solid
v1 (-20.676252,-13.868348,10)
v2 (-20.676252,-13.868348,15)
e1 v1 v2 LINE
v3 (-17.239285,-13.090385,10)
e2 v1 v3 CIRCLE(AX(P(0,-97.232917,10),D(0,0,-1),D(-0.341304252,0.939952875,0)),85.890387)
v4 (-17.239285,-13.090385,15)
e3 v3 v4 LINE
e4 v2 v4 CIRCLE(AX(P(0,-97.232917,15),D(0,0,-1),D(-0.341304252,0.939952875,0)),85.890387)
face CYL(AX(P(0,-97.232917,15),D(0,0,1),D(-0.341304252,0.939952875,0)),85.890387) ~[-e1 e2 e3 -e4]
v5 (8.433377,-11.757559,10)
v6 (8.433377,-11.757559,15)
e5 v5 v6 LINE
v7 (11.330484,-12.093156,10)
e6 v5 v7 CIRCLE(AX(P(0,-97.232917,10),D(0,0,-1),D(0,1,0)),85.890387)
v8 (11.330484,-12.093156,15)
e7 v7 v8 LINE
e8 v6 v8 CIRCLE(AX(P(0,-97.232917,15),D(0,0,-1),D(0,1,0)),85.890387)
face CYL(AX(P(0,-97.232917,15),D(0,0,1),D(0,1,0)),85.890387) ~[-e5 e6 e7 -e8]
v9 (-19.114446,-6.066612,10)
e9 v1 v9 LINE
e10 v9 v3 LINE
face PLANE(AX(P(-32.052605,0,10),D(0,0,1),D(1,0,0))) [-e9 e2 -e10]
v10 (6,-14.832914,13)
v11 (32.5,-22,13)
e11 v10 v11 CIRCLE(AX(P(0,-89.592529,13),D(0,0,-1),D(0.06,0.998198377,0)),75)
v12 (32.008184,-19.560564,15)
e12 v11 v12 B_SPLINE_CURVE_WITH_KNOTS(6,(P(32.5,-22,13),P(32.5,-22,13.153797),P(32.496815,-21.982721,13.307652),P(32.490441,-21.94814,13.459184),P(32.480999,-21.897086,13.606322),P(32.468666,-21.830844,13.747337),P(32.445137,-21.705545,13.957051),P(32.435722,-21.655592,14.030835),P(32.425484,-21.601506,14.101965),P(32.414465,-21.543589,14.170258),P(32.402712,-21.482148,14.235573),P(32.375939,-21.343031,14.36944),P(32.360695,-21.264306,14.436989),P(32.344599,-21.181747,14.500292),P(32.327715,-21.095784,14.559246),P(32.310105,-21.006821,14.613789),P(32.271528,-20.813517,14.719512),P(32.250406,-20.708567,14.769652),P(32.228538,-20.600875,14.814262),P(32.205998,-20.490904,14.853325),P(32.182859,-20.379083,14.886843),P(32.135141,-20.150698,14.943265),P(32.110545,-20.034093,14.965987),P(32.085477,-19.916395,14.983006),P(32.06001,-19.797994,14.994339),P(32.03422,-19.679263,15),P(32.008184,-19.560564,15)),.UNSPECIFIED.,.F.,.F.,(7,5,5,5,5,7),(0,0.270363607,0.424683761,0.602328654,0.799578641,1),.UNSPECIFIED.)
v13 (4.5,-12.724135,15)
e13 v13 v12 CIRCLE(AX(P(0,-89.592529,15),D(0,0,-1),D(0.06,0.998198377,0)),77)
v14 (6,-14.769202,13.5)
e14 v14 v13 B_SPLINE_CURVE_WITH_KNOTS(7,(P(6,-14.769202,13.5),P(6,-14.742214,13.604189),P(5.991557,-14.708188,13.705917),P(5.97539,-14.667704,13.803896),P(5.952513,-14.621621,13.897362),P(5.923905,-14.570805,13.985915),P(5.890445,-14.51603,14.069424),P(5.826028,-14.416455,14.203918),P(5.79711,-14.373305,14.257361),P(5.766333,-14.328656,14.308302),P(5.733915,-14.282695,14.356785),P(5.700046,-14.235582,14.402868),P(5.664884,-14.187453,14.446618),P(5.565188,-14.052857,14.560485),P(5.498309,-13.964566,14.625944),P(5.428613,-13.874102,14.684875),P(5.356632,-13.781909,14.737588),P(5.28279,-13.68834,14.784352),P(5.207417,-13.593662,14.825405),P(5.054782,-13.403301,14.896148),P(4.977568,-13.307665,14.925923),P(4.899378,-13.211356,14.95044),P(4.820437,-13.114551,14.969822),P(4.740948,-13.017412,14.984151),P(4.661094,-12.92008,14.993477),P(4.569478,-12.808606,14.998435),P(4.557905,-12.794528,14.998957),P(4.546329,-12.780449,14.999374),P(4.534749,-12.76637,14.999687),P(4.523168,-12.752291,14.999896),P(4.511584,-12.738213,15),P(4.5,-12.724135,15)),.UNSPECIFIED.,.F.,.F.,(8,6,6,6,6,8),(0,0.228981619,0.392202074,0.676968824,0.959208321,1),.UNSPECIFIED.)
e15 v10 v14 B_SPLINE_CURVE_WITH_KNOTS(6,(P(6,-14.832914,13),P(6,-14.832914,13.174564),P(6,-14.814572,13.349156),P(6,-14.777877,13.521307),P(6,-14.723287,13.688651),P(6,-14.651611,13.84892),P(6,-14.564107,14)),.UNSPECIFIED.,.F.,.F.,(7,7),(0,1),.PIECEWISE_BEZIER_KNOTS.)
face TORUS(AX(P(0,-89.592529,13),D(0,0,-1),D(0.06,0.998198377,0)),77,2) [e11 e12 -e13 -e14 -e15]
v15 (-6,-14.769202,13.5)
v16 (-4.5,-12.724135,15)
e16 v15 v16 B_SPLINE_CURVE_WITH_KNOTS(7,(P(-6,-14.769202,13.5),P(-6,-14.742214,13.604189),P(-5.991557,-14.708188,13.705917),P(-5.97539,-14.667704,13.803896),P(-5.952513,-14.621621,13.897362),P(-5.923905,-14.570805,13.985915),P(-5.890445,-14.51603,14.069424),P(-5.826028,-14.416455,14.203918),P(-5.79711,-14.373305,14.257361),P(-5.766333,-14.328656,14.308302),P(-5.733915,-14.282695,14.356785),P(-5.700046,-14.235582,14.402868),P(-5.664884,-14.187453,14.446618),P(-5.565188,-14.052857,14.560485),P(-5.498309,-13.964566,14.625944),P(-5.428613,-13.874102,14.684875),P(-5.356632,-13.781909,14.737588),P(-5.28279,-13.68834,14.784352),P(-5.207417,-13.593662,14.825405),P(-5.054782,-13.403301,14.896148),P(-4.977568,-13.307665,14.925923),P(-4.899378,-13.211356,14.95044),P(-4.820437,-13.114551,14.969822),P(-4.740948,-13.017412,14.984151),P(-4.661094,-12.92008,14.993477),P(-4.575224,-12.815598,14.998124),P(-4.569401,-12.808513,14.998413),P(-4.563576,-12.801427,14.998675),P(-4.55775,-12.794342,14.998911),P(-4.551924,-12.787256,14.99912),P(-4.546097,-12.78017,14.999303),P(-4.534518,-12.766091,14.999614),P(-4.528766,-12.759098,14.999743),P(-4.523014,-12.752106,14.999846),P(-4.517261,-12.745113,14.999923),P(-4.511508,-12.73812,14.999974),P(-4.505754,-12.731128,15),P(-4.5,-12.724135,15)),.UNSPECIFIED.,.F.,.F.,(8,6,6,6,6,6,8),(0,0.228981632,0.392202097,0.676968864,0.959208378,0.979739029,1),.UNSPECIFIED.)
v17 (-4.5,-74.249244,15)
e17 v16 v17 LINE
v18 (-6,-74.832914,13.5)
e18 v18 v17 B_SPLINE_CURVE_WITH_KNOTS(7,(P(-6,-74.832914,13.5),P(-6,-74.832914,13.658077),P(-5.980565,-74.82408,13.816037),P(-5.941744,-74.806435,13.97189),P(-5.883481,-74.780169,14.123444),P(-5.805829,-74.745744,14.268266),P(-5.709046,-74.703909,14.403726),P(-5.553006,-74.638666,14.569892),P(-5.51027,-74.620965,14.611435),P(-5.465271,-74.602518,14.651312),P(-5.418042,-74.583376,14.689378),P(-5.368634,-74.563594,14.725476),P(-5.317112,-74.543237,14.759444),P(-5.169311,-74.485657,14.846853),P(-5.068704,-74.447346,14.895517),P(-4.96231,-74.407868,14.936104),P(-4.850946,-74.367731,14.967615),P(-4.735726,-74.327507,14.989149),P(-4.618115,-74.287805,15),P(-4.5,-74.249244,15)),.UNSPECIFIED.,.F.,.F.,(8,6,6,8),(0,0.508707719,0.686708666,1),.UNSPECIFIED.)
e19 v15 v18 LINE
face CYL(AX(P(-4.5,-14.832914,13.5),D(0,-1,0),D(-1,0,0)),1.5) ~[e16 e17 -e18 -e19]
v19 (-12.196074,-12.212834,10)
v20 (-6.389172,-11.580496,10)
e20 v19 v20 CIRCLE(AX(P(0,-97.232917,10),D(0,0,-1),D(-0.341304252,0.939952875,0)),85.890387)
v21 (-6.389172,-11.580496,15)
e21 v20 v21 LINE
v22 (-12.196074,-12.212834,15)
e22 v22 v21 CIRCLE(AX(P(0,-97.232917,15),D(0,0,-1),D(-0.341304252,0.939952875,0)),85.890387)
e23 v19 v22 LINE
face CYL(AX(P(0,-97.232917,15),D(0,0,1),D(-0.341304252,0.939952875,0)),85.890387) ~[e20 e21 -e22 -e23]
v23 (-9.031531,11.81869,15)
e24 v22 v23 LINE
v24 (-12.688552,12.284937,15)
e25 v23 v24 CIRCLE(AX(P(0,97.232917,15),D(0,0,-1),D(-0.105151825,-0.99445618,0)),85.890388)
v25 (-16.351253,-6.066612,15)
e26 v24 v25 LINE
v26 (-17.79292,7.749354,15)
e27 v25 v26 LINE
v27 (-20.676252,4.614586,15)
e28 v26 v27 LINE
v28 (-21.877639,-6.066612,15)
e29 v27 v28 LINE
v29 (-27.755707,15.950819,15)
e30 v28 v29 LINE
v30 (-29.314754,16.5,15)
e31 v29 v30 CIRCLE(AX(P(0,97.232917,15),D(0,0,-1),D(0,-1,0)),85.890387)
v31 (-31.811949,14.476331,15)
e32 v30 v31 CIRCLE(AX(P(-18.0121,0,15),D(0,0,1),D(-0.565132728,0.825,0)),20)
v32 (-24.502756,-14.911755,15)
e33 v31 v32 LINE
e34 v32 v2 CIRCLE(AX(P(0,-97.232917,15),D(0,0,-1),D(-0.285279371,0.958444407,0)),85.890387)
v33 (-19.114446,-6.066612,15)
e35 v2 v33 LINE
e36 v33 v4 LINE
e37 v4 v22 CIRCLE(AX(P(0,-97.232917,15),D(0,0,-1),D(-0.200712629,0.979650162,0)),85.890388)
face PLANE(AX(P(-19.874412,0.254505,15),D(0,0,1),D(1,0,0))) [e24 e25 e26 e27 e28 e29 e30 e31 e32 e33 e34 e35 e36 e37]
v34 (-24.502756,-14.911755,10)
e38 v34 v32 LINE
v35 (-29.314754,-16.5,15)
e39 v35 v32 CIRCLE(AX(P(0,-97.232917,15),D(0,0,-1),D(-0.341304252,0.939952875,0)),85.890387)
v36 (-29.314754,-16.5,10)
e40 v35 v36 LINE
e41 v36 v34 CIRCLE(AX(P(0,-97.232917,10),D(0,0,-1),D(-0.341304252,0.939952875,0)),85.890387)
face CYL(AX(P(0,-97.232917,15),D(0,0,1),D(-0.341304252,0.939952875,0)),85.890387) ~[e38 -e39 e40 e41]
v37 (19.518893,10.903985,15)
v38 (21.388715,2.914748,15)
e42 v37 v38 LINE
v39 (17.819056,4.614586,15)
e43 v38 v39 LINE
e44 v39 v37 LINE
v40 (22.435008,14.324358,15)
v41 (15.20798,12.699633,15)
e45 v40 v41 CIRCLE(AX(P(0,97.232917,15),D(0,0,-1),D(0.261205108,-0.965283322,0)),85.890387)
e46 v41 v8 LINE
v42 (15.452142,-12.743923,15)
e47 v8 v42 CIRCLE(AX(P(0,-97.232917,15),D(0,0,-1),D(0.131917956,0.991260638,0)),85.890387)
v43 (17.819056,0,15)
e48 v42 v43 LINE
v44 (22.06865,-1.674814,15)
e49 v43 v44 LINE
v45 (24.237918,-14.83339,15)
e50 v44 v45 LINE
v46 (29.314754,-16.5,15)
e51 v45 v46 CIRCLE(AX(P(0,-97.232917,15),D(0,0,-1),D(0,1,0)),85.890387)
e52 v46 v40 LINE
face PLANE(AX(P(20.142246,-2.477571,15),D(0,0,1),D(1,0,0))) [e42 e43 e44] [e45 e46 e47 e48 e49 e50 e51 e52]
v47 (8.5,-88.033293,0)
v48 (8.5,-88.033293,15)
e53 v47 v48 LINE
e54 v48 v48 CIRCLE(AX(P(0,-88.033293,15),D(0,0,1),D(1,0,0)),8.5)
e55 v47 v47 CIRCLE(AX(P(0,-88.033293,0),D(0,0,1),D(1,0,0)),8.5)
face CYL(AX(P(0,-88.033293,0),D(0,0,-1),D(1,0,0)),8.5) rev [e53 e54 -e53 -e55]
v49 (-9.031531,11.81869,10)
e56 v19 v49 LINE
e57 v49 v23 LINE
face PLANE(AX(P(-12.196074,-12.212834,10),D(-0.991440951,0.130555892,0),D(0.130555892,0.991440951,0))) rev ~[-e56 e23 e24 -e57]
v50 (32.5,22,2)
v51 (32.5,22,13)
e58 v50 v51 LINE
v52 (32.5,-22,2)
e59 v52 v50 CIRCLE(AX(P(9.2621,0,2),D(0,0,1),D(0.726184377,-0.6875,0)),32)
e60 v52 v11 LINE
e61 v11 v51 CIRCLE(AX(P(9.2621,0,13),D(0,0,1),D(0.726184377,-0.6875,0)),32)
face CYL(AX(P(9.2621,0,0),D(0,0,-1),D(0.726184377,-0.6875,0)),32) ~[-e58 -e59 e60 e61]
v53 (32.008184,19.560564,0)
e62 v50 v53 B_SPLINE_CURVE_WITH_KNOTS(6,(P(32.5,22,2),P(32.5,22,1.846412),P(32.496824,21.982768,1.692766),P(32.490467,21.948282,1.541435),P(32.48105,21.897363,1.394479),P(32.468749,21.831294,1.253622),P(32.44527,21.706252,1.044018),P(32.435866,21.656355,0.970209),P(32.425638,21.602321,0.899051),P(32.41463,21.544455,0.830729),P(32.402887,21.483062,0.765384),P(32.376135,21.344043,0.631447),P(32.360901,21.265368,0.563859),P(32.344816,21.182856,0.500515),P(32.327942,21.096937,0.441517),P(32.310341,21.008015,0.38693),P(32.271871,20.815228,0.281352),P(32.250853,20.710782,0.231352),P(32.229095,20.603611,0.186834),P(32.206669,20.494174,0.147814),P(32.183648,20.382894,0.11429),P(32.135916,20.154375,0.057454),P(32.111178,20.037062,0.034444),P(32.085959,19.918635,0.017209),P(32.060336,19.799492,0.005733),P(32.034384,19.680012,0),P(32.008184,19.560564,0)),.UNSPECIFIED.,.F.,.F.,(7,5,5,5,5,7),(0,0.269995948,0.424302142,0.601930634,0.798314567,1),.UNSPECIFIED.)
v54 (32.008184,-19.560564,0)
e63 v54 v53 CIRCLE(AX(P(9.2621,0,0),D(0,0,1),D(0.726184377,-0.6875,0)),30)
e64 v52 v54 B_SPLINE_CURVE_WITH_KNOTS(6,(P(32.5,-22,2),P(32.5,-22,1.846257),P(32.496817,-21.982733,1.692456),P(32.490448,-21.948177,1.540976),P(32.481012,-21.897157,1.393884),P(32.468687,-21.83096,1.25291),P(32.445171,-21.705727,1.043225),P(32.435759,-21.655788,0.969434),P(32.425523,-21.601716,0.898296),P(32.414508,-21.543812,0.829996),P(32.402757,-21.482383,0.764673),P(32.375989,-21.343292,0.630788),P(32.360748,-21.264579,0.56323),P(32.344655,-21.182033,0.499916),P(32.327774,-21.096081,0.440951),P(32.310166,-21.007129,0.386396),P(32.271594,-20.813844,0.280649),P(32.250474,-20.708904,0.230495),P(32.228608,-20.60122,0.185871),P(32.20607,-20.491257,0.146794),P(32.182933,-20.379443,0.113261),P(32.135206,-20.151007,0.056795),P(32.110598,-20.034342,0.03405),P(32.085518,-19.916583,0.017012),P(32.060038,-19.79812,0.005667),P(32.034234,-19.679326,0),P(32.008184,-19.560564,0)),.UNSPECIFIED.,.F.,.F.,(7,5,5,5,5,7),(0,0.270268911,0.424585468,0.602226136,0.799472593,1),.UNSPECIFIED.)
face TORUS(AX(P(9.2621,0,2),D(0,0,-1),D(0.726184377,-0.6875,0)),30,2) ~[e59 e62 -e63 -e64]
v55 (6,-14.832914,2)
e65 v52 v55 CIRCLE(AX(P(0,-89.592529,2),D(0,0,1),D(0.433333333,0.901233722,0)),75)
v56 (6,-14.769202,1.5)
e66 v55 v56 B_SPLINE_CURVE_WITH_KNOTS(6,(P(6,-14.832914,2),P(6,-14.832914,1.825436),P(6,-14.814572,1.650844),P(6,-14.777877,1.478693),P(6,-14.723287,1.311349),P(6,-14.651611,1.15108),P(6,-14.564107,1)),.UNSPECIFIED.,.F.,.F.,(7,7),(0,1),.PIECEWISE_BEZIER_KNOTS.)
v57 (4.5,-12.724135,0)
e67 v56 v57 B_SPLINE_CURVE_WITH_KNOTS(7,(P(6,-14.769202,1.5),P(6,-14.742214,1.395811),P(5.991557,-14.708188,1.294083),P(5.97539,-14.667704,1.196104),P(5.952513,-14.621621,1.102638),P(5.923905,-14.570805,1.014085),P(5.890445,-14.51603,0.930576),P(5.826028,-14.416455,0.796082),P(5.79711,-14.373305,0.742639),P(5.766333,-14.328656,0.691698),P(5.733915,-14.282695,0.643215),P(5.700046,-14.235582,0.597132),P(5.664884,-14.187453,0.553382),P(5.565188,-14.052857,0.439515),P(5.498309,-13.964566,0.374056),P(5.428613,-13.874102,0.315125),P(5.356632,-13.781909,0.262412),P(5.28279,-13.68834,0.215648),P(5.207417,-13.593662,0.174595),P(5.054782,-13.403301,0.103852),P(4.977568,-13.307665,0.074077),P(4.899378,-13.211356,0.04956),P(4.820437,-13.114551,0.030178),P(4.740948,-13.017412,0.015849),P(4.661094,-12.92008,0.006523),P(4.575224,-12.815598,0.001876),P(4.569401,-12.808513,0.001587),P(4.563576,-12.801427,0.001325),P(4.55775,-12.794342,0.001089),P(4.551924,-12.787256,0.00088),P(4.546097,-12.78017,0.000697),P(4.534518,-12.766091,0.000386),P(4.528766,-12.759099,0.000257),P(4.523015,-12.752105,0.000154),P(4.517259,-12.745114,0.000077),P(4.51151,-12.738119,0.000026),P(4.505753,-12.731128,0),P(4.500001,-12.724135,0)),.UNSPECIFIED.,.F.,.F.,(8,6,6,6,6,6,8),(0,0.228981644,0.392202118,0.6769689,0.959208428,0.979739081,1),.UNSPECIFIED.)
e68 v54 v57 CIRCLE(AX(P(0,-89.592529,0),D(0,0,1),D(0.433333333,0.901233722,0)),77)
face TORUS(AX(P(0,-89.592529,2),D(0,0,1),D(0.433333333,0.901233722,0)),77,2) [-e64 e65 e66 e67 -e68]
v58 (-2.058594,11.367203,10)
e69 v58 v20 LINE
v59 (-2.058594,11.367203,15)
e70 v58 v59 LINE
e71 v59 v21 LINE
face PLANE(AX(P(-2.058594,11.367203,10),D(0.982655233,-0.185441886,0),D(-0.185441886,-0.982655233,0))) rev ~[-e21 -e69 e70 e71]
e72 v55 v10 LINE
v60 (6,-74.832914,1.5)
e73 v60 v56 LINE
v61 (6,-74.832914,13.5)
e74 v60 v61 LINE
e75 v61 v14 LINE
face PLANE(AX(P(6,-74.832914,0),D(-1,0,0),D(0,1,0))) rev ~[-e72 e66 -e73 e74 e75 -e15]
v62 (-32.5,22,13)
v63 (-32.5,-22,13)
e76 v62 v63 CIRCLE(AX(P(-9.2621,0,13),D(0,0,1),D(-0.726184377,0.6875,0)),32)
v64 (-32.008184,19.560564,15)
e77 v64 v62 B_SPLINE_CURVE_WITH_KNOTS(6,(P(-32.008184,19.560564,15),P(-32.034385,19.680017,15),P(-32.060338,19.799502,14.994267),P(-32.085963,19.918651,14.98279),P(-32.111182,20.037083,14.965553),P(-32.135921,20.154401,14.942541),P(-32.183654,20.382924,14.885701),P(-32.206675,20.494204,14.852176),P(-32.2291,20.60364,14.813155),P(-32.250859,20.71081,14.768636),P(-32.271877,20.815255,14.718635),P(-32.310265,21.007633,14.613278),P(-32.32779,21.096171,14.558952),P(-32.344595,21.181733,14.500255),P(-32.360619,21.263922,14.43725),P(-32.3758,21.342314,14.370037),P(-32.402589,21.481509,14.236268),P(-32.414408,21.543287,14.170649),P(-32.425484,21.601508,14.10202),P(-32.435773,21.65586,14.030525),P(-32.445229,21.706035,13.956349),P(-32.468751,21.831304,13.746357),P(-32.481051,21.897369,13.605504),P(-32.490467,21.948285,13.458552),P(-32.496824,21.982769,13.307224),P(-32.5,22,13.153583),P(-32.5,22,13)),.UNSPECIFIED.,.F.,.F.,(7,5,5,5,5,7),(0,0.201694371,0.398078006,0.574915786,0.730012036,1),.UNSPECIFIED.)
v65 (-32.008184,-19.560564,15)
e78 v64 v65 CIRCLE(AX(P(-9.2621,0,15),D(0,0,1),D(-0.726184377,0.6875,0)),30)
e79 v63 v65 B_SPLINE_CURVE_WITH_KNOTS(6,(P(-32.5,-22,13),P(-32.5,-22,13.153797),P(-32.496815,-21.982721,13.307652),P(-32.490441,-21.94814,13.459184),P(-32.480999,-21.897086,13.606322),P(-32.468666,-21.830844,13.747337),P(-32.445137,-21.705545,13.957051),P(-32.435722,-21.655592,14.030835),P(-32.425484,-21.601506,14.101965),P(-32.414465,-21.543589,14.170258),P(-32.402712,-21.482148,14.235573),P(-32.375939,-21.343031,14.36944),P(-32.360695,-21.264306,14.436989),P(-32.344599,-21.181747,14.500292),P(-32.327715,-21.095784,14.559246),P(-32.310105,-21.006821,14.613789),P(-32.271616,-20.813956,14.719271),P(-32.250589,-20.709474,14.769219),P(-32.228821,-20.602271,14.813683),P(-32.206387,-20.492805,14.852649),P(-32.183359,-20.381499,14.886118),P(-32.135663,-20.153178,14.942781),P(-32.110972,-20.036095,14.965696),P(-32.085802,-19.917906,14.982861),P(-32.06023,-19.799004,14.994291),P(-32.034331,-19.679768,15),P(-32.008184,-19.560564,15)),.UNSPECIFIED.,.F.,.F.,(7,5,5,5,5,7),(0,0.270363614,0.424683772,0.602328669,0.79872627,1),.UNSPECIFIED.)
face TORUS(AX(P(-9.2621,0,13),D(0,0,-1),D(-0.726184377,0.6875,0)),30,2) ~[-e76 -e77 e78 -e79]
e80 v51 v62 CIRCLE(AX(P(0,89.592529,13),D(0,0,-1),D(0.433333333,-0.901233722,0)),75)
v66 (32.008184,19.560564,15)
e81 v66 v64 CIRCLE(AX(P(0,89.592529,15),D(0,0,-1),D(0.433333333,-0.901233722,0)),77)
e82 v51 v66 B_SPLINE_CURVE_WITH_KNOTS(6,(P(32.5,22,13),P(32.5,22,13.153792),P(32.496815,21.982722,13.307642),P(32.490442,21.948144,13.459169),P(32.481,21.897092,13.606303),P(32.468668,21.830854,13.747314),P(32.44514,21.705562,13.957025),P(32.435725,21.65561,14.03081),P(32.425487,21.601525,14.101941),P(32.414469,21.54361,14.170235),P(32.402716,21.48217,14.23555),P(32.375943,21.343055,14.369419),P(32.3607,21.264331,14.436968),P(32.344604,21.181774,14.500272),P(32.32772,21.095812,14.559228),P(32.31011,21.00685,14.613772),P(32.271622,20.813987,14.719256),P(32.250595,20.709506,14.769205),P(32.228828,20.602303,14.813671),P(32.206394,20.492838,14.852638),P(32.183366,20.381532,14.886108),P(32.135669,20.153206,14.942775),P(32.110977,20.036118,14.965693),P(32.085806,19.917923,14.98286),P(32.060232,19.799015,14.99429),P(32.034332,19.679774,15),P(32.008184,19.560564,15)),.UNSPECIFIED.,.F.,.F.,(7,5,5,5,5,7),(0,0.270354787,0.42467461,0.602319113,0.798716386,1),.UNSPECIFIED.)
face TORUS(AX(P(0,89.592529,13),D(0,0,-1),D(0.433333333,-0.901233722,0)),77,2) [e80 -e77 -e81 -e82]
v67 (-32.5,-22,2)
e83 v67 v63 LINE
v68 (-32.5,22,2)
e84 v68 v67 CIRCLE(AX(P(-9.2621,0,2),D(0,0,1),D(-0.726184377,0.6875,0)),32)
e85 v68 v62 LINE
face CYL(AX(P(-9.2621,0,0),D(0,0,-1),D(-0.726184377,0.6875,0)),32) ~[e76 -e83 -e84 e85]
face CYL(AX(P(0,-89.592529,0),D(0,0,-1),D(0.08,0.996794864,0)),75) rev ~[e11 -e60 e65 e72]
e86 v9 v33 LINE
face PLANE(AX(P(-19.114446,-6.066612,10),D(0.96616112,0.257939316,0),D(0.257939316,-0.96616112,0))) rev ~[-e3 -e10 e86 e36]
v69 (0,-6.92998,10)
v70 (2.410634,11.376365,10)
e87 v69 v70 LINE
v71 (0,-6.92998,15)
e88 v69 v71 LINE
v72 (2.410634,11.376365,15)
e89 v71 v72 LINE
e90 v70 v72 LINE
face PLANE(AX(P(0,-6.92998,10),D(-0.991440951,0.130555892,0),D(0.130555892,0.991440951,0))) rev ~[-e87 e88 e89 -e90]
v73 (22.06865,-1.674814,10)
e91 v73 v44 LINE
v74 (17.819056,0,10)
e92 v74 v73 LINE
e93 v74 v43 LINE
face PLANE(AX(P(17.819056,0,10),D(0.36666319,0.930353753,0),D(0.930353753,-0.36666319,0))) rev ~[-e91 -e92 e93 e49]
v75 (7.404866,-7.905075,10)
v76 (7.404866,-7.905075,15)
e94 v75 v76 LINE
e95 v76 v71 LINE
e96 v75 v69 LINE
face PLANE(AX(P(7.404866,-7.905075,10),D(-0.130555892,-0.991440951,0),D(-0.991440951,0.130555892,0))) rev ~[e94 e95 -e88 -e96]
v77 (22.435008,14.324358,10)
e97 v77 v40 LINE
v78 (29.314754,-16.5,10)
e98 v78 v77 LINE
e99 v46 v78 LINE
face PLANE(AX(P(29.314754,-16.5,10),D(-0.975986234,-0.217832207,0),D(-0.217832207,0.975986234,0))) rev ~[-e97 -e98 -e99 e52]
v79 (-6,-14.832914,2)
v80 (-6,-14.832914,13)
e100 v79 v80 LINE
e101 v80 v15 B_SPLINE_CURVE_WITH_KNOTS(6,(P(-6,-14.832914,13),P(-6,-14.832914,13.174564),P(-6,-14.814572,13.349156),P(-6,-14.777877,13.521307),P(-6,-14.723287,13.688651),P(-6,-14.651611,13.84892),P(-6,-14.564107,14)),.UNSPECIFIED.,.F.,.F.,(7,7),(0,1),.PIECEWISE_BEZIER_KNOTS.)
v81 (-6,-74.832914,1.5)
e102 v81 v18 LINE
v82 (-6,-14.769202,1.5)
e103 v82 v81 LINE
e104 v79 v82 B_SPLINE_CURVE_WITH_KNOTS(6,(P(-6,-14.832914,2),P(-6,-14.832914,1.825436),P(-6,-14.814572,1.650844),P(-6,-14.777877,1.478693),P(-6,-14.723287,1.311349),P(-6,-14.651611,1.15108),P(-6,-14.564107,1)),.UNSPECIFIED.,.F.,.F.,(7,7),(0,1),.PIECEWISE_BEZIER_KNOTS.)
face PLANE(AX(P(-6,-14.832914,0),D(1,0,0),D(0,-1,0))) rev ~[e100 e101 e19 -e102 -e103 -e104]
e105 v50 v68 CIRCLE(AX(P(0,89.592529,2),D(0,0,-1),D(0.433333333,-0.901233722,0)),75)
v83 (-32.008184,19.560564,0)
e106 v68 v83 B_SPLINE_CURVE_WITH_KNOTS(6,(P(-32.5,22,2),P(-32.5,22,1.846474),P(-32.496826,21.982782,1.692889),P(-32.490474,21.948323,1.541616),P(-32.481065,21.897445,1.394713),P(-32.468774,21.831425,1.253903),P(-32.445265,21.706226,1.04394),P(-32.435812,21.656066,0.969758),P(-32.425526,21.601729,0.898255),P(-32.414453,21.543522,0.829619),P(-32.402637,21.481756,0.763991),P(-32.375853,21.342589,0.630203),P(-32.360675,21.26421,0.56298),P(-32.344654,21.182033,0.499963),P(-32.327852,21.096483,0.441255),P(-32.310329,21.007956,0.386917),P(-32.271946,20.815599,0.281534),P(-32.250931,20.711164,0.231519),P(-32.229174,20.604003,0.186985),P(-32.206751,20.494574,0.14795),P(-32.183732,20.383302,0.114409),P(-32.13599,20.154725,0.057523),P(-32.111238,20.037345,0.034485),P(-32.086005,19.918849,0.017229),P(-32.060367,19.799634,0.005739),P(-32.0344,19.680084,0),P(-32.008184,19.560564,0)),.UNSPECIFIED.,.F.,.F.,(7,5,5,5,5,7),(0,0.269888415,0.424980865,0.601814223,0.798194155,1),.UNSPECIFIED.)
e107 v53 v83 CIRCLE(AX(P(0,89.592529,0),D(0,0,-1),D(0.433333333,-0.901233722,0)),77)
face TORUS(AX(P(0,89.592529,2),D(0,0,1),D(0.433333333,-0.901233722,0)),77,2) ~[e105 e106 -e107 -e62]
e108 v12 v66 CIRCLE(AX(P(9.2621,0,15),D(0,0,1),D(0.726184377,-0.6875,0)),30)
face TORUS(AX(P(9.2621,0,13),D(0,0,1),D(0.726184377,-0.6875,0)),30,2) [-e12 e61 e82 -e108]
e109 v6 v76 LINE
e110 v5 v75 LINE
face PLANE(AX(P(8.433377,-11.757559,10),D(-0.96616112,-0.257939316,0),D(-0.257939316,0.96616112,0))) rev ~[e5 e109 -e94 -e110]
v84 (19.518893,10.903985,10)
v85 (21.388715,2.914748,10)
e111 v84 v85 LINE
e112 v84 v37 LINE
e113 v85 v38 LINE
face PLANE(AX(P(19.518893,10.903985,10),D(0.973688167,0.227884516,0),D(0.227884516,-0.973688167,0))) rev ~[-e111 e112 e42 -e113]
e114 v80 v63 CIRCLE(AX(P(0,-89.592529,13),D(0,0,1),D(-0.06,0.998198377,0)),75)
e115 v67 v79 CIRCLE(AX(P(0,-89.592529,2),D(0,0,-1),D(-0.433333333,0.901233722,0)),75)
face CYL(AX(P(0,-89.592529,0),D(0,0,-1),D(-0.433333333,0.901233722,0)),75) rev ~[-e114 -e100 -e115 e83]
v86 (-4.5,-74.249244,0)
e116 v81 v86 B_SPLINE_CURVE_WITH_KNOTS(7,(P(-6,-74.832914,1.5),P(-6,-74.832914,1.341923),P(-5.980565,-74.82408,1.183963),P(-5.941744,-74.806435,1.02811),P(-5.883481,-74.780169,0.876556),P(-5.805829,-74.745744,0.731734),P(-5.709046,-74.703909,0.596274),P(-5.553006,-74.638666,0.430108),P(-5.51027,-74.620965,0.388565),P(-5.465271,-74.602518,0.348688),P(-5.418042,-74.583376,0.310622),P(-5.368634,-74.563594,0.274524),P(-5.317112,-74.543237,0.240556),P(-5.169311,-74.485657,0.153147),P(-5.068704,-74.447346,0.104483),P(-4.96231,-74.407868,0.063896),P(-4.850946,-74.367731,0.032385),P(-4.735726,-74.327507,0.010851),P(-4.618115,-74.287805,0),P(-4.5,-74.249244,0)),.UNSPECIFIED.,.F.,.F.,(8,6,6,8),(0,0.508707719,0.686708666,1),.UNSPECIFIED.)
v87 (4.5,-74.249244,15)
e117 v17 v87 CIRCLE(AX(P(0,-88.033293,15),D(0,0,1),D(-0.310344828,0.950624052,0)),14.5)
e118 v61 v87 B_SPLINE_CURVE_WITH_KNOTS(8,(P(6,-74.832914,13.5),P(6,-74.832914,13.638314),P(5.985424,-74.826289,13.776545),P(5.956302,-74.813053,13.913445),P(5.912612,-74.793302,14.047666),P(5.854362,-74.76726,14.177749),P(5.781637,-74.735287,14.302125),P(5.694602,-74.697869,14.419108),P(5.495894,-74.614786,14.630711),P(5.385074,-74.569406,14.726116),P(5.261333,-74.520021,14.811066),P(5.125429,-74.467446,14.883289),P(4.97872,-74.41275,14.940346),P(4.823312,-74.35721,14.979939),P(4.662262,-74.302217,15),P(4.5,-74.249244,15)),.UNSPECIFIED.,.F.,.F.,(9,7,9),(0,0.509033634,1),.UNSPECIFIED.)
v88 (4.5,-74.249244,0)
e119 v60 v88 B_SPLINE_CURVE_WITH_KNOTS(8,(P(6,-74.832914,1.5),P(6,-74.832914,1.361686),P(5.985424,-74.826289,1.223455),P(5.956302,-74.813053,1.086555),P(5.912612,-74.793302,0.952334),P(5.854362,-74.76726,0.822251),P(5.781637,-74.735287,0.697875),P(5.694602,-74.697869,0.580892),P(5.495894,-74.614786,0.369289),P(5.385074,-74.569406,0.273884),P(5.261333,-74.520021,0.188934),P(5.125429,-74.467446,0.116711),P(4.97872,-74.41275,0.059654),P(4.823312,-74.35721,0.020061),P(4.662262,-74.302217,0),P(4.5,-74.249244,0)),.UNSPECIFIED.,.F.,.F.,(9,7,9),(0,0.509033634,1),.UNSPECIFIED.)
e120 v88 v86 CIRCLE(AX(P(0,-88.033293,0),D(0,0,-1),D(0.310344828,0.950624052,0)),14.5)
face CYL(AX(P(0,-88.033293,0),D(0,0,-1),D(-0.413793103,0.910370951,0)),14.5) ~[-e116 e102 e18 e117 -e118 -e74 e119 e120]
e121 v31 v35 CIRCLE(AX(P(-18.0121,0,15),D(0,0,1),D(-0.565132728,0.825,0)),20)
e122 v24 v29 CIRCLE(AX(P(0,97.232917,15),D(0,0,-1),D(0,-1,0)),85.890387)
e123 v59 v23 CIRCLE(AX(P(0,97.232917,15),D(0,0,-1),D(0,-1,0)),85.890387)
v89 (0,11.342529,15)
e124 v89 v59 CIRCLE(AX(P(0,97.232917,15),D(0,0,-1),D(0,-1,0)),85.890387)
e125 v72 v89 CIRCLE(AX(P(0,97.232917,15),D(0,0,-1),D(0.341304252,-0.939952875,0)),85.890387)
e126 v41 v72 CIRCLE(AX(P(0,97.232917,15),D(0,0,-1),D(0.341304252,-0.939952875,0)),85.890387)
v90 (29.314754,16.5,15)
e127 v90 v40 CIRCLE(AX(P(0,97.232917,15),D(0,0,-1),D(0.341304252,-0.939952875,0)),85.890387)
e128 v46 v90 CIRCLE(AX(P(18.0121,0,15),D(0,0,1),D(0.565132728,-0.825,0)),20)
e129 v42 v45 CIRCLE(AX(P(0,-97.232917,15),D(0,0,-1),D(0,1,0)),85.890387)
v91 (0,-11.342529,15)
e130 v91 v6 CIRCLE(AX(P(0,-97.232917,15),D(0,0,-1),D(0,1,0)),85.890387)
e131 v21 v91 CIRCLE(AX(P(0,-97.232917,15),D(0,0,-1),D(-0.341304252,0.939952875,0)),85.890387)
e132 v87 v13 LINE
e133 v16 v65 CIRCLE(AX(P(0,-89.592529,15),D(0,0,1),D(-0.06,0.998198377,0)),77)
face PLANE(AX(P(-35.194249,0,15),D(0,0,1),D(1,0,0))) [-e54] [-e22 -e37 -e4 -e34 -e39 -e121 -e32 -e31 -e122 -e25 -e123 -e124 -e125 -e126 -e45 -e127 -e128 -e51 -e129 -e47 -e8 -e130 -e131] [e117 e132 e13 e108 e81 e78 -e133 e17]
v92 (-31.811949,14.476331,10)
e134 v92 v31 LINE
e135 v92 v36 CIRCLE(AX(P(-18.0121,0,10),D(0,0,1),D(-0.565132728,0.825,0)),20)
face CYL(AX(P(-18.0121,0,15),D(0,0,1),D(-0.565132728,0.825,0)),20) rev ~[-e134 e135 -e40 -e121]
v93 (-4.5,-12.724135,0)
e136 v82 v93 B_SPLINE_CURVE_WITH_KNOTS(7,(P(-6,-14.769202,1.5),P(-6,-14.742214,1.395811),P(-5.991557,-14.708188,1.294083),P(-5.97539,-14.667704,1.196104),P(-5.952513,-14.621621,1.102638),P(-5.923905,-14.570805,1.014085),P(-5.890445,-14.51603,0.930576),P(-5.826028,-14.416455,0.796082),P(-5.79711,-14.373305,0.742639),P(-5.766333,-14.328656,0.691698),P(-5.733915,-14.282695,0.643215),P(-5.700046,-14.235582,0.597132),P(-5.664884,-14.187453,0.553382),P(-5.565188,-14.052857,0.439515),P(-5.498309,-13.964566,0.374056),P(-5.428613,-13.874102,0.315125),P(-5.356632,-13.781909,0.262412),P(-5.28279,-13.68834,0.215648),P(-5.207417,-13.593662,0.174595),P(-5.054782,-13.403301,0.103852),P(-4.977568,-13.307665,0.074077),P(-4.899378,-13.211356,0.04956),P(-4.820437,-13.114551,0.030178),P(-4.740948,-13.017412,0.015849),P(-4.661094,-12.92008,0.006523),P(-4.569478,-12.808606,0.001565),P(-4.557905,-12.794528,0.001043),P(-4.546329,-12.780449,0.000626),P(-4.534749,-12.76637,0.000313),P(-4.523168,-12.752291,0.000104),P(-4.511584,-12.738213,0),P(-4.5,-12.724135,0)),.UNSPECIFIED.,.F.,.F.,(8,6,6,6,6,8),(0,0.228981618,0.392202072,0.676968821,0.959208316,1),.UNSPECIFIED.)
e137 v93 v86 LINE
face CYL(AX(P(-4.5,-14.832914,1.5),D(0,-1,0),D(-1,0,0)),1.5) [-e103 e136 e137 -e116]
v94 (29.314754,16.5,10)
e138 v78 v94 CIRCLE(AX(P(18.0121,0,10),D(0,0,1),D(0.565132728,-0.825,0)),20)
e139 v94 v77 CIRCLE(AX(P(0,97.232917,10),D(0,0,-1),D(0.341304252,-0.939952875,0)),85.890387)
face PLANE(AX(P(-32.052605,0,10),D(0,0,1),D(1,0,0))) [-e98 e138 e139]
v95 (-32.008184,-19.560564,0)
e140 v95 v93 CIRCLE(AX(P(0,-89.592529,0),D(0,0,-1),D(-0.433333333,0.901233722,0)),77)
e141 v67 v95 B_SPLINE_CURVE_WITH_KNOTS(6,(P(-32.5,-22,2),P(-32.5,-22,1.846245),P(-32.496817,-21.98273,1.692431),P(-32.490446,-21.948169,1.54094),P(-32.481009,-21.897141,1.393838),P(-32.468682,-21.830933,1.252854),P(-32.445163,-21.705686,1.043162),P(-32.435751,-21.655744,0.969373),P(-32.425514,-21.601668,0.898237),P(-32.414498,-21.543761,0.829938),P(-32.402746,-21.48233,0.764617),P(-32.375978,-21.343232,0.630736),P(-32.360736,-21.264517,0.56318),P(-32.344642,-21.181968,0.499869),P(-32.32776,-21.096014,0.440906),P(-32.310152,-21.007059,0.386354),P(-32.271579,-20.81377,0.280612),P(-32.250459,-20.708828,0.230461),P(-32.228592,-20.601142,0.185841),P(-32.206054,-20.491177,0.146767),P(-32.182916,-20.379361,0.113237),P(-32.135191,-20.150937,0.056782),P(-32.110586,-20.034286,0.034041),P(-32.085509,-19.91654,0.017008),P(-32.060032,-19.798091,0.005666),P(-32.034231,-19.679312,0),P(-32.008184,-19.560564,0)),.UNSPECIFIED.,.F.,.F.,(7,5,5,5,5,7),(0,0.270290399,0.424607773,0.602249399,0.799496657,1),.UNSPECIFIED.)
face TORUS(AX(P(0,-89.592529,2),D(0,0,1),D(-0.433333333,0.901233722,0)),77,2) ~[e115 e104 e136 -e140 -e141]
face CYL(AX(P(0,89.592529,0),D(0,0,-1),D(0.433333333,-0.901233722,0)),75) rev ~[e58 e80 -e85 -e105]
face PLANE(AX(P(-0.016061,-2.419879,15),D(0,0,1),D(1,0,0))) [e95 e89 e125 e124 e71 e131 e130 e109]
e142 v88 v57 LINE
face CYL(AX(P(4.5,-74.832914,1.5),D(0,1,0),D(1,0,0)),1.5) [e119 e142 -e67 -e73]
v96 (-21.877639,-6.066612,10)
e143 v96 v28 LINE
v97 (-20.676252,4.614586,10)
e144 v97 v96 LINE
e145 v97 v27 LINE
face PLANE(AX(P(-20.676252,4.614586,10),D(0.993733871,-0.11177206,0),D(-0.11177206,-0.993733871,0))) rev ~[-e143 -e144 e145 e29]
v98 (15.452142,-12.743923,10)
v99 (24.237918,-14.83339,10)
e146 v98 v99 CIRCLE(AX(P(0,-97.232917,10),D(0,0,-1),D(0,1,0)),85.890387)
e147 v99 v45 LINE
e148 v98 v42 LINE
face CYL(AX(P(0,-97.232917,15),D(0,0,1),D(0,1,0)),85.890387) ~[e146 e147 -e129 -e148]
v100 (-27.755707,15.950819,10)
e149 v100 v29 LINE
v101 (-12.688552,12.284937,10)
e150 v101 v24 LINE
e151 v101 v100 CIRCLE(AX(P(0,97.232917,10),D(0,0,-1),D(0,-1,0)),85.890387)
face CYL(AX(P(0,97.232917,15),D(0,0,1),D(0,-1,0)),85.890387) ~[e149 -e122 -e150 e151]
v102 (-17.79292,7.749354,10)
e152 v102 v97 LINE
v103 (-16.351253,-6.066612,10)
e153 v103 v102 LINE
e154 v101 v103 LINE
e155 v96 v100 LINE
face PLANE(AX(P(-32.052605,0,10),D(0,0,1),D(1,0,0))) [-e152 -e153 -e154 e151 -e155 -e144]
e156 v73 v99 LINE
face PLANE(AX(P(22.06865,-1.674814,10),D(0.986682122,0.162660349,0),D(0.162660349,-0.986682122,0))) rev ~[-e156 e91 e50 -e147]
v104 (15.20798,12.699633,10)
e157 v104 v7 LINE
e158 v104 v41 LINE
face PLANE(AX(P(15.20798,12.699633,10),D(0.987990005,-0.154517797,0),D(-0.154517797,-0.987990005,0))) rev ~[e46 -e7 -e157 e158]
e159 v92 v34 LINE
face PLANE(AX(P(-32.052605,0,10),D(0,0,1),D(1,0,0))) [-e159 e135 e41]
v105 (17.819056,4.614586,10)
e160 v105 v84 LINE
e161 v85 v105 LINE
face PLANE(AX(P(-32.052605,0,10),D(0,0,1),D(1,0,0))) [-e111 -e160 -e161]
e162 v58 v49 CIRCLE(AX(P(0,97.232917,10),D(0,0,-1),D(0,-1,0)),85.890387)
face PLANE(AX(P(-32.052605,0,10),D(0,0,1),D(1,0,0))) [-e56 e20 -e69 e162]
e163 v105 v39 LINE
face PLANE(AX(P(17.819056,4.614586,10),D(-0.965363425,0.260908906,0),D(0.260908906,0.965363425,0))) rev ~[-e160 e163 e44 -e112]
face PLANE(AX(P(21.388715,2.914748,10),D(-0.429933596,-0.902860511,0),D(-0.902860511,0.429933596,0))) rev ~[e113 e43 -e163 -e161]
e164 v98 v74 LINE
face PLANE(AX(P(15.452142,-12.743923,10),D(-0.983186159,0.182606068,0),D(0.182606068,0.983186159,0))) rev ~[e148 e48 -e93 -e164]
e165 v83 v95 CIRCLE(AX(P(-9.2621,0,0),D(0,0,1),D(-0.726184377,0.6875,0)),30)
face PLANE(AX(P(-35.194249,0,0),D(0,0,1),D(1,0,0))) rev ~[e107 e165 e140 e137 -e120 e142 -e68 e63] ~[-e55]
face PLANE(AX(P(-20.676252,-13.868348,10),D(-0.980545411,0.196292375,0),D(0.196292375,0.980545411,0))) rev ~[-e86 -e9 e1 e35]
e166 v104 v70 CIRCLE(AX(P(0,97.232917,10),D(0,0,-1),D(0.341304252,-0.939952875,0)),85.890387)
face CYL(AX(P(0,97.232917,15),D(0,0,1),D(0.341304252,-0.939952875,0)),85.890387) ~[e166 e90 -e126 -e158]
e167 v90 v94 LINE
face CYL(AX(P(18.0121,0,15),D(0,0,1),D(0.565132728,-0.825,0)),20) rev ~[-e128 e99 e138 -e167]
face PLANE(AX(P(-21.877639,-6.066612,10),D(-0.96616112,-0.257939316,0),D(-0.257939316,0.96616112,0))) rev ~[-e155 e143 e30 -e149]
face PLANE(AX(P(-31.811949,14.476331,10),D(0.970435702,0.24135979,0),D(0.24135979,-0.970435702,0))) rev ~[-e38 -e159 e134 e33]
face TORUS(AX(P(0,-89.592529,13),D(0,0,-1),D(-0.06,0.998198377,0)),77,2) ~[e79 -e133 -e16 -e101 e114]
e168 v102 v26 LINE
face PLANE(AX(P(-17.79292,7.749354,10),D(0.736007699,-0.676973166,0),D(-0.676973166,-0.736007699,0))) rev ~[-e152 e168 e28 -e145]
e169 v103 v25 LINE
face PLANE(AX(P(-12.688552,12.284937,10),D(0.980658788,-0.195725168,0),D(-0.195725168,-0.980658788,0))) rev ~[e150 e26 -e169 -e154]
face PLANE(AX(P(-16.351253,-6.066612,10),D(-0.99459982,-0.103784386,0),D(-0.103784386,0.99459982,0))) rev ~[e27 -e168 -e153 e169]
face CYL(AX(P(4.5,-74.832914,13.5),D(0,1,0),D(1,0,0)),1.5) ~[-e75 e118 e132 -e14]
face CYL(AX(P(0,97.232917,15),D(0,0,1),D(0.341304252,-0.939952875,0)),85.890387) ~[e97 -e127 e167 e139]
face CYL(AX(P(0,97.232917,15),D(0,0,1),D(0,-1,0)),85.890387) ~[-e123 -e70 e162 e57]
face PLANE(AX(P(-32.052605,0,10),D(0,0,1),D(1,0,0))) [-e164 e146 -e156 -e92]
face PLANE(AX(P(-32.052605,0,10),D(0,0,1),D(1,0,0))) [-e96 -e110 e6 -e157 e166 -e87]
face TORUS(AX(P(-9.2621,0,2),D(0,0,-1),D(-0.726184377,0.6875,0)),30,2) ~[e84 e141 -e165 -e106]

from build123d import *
from build123d import SkipClean  # not in build123d's __all__

# Parameters (mm, degrees)
F0_R     = 8.5
F1_DEPTH = 15
F2_R     = 1.5
F4_R     = 2
F5_DEPTH = 5
F7_DEPTH = 5


with BuildPart() as f1:
    # F0 (on Top) → F1 (new body)
    with BuildSketch(Plane.XY):
        with BuildLine():
            Line((-32.5, -22), (-32.5, 22))
            ThreePointArc((-32.5, 22), (-41.2620999228, 0), (-32.5, -22))
        make_face()
        with BuildLine():
            ThreePointArc((32.5, 22), (0, 14.592529173), (-32.5, 22))
            Line((-32.5, 22), (0, 0))
            Line((0, 0), (32.5, 22))
        make_face()
        Polygon((0, 0), (-32.5, 22), (-32.5, -22), align=None)
        with BuildLine():
            Line((0, 0), (-32.5, -22))
            ThreePointArc((-32.5, -22), (-19.5807119119, -17.1936637052), (-6, -14.8329144067))
            ThreePointArc((-6, -14.8329144067), (0, -14.592529173), (6, -14.8329144067))
            ThreePointArc((6, -14.8329144067), (19.5807119119, -17.1936637052), (32.5, -22))
            Line((32.5, -22), (0, 0))
        make_face()
        Polygon((32.5, -22), (32.5, 22), (0, 0), align=None)
        with BuildLine():
            ThreePointArc((32.5, -22), (41.2620999228, 0), (32.5, 22))
            Line((32.5, 22), (32.5, -22))
        make_face()
        with BuildLine():
            ThreePointArc((6, -14.8329144067), (0, -14.592529173), (-6, -14.8329144067))
            Line((-6, -14.8329144067), (-6, -74.8329144067))
            Line((-6, -74.8329144067), (6, -74.8329144067))
            Line((6, -74.8329144067), (6, -14.8329144067))
        make_face()
        with BuildLine():
            Line((6, -74.8329144067), (-6, -74.8329144067))
            ThreePointArc((-6, -74.8329144067), (0, -102.5332931892), (6, -74.8329144067))
        make_face()
        with Locations((0, -88.0332931892)):
            Circle(F0_R, mode=Mode.SUBTRACT)
    extrude(amount=F1_DEPTH)

    # F2
    f2_edges = [f1.edges().sort_by_distance(p)[0] for p in [
        (-6, -44.832914, 15),
        (6, -44.832914, 15),
        (6, -44.832914, 0),
        (-6, -44.832914, 0),
    ]]
    fillet(f2_edges, radius=F2_R)

    # F4
    f4_edges = [f1.edges().sort_by_distance(p)[0] for p in [
        (-19.580712, -17.193664, 15),
        (-41.2621, 0, 15),
        (19.580712, -17.193664, 15),
        (-19.580712, -17.193664, 0),
        (-41.2621, 0, 0),
        (0, 14.592529, 0),
        (41.2621, 0, 0),
        (19.580712, -17.193664, 0),
        (41.2621, 0, 15),
        (0, 14.592529, 15),
    ]]
    fillet(f4_edges, radius=F4_R)

    # F3 (on face) → F5 (cut)
    with BuildSketch(Plane.XY.offset(15)):
        with BuildLine():
            Line((-29.3147544782, -16.5), (-29.3147544782, 16.5))
            ThreePointArc((-29.3147544782, 16.5), (-38.0120999228, 0), (-29.3147544782, -16.5))
        make_face()
        with BuildLine():
            ThreePointArc((0, 11.342529173), (-14.8824925286, 12.6417227993), (-29.3147544782, 16.5))
            Line((-29.3147544782, 16.5), (0, 0))
            Line((0, 0), (0, 11.342529173))
        make_face()
        Polygon((0, 0), (-29.3147544782, 16.5), (-29.3147544782, -16.5), align=None)
        with BuildLine():
            Line((0, 0), (-29.3147544782, -16.5))
            ThreePointArc((-29.3147544782, -16.5), (-14.8824925285, -12.6417227993), (0, -11.342529173))
            Line((0, -11.342529173), (0, 0))
        make_face()
        with BuildLine():
            ThreePointArc((29.3147544782, 16.5), (14.8824925286, 12.6417227993), (0, 11.342529173))
            Line((0, 11.342529173), (0, 0))
            Line((0, 0), (29.3147544782, 16.5))
        make_face()
        Polygon((29.3147544782, 16.5), (0, 0), (29.3147544782, -16.5), align=None)
        with BuildLine():
            Line((29.3147544782, -16.5), (0, 0))
            Line((0, 0), (0, -11.342529173))
            ThreePointArc((0, -11.342529173), (14.8824925286, -12.6417227993), (29.3147544782, -16.5))
        make_face()
        with BuildLine():
            ThreePointArc((29.3147544782, -16.5), (38.0120999228, 0), (29.3147544782, 16.5))
            Line((29.3147544782, 16.5), (29.3147544782, -16.5))
        make_face()
    with SkipClean():  # cleaning this boolean's faces spoils the solid; the shape is the same uncleaned
        extrude(amount=-F5_DEPTH, mode=Mode.SUBTRACT)

    # F6 (on face) → F7 (join)
    with BuildSketch(Plane.XY.offset(10)):
        with BuildLine():
            Line((15.2079802839, 12.699633284), (11.3304843403, -12.0931563405))
            ThreePointArc((11.3304843403, -12.0931563405), (13.3952654965, -12.3935064492), (15.4521416161, -12.7439233999))
            Line((15.4521416161, -12.7439233999), (17.8190562874, 0))
            Line((17.8190562874, 0), (22.0686495304, -1.6748139169))
            Line((22.0686495304, -1.6748139169), (24.2379181726, -14.8333900519))
            ThreePointArc((24.2379181726, -14.8333900519), (26.7892998078, -15.6272055953), (29.3147544782, -16.5))
            Line((29.3147544782, -16.5), (22.4350078947, 14.3243580948))
            ThreePointArc((22.4350078947, 14.3243580948), (18.8390172894, 13.4340497811), (15.2079802839, 12.699633284))
        make_face()
        Polygon((17.8190562874, 4.6145855449), (19.5188932121, 10.9039852396), (21.3887151331, 2.9147479217), align=None, mode=Mode.SUBTRACT)
        with BuildLine():
            Line((-2.0585943572, 11.3672025947), (-6.3891717286, -11.5804961029))
            ThreePointArc((-6.3891717286, -11.5804961029), (1.0259296068, -11.3486565705), (8.4333769686, -11.7575587165))
            Line((8.4333769686, -11.7575587165), (7.4048662885, -7.905074934))
            Line((7.4048662885, -7.905074934), (0, -6.9299801253))
            Line((0, -6.9299801253), (2.4106339203, 11.3763647448))
            ThreePointArc((2.4106339203, 11.3763647448), (0.1760793848, 11.3427096587), (-2.0585943572, 11.3672025947))
        make_face()
        with BuildLine():
            ThreePointArc((-29.3147544782, 16.5), (-30.604070915, 15.5384126129), (-31.8119491831, 14.4763310404))
            Line((-31.8119491831, 14.4763310404), (-24.5027556892, -14.9117551872))
            ThreePointArc((-24.5027556892, -14.9117551872), (-22.5955271512, -14.3679613691), (-20.6762515008, -13.8683481283))
            Line((-20.6762515008, -13.8683481283), (-19.114445895, -6.066611968))
            Line((-19.114445895, -6.066611968), (-17.2392854565, -13.0903846112))
            ThreePointArc((-17.2392854565, -13.0903846112), (-14.7242186042, -12.614029589), (-12.1960735351, -12.2128340149))
            Line((-12.1960735351, -12.2128340149), (-9.0315309989, 11.8186900319))
            ThreePointArc((-9.0315309989, 11.8186900319), (-10.8625432372, 12.0321900371), (-12.6885517924, 12.2849366013))
            Line((-12.6885517924, 12.2849366013), (-16.3512527943, -6.066611968))
            Line((-16.3512527943, -6.066611968), (-17.7929196507, 7.7493544668))
            Line((-17.7929196507, 7.7493544668), (-20.6762515008, 4.6145855449))
            Line((-20.6762515008, 4.6145855449), (-21.8776389956, -6.066611968))
            Line((-21.8776389956, -6.066611968), (-27.7557073698, 15.9508191787))
            ThreePointArc((-27.7557073698, 15.9508191787), (-28.5365520654, 16.2216590548), (-29.3147544782, 16.5))
        make_face()
    with SkipClean():  # cleaning this boolean's faces spoils the solid; the shape is the same uncleaned
        extrude(amount=F7_DEPTH)


solid = f1.part
